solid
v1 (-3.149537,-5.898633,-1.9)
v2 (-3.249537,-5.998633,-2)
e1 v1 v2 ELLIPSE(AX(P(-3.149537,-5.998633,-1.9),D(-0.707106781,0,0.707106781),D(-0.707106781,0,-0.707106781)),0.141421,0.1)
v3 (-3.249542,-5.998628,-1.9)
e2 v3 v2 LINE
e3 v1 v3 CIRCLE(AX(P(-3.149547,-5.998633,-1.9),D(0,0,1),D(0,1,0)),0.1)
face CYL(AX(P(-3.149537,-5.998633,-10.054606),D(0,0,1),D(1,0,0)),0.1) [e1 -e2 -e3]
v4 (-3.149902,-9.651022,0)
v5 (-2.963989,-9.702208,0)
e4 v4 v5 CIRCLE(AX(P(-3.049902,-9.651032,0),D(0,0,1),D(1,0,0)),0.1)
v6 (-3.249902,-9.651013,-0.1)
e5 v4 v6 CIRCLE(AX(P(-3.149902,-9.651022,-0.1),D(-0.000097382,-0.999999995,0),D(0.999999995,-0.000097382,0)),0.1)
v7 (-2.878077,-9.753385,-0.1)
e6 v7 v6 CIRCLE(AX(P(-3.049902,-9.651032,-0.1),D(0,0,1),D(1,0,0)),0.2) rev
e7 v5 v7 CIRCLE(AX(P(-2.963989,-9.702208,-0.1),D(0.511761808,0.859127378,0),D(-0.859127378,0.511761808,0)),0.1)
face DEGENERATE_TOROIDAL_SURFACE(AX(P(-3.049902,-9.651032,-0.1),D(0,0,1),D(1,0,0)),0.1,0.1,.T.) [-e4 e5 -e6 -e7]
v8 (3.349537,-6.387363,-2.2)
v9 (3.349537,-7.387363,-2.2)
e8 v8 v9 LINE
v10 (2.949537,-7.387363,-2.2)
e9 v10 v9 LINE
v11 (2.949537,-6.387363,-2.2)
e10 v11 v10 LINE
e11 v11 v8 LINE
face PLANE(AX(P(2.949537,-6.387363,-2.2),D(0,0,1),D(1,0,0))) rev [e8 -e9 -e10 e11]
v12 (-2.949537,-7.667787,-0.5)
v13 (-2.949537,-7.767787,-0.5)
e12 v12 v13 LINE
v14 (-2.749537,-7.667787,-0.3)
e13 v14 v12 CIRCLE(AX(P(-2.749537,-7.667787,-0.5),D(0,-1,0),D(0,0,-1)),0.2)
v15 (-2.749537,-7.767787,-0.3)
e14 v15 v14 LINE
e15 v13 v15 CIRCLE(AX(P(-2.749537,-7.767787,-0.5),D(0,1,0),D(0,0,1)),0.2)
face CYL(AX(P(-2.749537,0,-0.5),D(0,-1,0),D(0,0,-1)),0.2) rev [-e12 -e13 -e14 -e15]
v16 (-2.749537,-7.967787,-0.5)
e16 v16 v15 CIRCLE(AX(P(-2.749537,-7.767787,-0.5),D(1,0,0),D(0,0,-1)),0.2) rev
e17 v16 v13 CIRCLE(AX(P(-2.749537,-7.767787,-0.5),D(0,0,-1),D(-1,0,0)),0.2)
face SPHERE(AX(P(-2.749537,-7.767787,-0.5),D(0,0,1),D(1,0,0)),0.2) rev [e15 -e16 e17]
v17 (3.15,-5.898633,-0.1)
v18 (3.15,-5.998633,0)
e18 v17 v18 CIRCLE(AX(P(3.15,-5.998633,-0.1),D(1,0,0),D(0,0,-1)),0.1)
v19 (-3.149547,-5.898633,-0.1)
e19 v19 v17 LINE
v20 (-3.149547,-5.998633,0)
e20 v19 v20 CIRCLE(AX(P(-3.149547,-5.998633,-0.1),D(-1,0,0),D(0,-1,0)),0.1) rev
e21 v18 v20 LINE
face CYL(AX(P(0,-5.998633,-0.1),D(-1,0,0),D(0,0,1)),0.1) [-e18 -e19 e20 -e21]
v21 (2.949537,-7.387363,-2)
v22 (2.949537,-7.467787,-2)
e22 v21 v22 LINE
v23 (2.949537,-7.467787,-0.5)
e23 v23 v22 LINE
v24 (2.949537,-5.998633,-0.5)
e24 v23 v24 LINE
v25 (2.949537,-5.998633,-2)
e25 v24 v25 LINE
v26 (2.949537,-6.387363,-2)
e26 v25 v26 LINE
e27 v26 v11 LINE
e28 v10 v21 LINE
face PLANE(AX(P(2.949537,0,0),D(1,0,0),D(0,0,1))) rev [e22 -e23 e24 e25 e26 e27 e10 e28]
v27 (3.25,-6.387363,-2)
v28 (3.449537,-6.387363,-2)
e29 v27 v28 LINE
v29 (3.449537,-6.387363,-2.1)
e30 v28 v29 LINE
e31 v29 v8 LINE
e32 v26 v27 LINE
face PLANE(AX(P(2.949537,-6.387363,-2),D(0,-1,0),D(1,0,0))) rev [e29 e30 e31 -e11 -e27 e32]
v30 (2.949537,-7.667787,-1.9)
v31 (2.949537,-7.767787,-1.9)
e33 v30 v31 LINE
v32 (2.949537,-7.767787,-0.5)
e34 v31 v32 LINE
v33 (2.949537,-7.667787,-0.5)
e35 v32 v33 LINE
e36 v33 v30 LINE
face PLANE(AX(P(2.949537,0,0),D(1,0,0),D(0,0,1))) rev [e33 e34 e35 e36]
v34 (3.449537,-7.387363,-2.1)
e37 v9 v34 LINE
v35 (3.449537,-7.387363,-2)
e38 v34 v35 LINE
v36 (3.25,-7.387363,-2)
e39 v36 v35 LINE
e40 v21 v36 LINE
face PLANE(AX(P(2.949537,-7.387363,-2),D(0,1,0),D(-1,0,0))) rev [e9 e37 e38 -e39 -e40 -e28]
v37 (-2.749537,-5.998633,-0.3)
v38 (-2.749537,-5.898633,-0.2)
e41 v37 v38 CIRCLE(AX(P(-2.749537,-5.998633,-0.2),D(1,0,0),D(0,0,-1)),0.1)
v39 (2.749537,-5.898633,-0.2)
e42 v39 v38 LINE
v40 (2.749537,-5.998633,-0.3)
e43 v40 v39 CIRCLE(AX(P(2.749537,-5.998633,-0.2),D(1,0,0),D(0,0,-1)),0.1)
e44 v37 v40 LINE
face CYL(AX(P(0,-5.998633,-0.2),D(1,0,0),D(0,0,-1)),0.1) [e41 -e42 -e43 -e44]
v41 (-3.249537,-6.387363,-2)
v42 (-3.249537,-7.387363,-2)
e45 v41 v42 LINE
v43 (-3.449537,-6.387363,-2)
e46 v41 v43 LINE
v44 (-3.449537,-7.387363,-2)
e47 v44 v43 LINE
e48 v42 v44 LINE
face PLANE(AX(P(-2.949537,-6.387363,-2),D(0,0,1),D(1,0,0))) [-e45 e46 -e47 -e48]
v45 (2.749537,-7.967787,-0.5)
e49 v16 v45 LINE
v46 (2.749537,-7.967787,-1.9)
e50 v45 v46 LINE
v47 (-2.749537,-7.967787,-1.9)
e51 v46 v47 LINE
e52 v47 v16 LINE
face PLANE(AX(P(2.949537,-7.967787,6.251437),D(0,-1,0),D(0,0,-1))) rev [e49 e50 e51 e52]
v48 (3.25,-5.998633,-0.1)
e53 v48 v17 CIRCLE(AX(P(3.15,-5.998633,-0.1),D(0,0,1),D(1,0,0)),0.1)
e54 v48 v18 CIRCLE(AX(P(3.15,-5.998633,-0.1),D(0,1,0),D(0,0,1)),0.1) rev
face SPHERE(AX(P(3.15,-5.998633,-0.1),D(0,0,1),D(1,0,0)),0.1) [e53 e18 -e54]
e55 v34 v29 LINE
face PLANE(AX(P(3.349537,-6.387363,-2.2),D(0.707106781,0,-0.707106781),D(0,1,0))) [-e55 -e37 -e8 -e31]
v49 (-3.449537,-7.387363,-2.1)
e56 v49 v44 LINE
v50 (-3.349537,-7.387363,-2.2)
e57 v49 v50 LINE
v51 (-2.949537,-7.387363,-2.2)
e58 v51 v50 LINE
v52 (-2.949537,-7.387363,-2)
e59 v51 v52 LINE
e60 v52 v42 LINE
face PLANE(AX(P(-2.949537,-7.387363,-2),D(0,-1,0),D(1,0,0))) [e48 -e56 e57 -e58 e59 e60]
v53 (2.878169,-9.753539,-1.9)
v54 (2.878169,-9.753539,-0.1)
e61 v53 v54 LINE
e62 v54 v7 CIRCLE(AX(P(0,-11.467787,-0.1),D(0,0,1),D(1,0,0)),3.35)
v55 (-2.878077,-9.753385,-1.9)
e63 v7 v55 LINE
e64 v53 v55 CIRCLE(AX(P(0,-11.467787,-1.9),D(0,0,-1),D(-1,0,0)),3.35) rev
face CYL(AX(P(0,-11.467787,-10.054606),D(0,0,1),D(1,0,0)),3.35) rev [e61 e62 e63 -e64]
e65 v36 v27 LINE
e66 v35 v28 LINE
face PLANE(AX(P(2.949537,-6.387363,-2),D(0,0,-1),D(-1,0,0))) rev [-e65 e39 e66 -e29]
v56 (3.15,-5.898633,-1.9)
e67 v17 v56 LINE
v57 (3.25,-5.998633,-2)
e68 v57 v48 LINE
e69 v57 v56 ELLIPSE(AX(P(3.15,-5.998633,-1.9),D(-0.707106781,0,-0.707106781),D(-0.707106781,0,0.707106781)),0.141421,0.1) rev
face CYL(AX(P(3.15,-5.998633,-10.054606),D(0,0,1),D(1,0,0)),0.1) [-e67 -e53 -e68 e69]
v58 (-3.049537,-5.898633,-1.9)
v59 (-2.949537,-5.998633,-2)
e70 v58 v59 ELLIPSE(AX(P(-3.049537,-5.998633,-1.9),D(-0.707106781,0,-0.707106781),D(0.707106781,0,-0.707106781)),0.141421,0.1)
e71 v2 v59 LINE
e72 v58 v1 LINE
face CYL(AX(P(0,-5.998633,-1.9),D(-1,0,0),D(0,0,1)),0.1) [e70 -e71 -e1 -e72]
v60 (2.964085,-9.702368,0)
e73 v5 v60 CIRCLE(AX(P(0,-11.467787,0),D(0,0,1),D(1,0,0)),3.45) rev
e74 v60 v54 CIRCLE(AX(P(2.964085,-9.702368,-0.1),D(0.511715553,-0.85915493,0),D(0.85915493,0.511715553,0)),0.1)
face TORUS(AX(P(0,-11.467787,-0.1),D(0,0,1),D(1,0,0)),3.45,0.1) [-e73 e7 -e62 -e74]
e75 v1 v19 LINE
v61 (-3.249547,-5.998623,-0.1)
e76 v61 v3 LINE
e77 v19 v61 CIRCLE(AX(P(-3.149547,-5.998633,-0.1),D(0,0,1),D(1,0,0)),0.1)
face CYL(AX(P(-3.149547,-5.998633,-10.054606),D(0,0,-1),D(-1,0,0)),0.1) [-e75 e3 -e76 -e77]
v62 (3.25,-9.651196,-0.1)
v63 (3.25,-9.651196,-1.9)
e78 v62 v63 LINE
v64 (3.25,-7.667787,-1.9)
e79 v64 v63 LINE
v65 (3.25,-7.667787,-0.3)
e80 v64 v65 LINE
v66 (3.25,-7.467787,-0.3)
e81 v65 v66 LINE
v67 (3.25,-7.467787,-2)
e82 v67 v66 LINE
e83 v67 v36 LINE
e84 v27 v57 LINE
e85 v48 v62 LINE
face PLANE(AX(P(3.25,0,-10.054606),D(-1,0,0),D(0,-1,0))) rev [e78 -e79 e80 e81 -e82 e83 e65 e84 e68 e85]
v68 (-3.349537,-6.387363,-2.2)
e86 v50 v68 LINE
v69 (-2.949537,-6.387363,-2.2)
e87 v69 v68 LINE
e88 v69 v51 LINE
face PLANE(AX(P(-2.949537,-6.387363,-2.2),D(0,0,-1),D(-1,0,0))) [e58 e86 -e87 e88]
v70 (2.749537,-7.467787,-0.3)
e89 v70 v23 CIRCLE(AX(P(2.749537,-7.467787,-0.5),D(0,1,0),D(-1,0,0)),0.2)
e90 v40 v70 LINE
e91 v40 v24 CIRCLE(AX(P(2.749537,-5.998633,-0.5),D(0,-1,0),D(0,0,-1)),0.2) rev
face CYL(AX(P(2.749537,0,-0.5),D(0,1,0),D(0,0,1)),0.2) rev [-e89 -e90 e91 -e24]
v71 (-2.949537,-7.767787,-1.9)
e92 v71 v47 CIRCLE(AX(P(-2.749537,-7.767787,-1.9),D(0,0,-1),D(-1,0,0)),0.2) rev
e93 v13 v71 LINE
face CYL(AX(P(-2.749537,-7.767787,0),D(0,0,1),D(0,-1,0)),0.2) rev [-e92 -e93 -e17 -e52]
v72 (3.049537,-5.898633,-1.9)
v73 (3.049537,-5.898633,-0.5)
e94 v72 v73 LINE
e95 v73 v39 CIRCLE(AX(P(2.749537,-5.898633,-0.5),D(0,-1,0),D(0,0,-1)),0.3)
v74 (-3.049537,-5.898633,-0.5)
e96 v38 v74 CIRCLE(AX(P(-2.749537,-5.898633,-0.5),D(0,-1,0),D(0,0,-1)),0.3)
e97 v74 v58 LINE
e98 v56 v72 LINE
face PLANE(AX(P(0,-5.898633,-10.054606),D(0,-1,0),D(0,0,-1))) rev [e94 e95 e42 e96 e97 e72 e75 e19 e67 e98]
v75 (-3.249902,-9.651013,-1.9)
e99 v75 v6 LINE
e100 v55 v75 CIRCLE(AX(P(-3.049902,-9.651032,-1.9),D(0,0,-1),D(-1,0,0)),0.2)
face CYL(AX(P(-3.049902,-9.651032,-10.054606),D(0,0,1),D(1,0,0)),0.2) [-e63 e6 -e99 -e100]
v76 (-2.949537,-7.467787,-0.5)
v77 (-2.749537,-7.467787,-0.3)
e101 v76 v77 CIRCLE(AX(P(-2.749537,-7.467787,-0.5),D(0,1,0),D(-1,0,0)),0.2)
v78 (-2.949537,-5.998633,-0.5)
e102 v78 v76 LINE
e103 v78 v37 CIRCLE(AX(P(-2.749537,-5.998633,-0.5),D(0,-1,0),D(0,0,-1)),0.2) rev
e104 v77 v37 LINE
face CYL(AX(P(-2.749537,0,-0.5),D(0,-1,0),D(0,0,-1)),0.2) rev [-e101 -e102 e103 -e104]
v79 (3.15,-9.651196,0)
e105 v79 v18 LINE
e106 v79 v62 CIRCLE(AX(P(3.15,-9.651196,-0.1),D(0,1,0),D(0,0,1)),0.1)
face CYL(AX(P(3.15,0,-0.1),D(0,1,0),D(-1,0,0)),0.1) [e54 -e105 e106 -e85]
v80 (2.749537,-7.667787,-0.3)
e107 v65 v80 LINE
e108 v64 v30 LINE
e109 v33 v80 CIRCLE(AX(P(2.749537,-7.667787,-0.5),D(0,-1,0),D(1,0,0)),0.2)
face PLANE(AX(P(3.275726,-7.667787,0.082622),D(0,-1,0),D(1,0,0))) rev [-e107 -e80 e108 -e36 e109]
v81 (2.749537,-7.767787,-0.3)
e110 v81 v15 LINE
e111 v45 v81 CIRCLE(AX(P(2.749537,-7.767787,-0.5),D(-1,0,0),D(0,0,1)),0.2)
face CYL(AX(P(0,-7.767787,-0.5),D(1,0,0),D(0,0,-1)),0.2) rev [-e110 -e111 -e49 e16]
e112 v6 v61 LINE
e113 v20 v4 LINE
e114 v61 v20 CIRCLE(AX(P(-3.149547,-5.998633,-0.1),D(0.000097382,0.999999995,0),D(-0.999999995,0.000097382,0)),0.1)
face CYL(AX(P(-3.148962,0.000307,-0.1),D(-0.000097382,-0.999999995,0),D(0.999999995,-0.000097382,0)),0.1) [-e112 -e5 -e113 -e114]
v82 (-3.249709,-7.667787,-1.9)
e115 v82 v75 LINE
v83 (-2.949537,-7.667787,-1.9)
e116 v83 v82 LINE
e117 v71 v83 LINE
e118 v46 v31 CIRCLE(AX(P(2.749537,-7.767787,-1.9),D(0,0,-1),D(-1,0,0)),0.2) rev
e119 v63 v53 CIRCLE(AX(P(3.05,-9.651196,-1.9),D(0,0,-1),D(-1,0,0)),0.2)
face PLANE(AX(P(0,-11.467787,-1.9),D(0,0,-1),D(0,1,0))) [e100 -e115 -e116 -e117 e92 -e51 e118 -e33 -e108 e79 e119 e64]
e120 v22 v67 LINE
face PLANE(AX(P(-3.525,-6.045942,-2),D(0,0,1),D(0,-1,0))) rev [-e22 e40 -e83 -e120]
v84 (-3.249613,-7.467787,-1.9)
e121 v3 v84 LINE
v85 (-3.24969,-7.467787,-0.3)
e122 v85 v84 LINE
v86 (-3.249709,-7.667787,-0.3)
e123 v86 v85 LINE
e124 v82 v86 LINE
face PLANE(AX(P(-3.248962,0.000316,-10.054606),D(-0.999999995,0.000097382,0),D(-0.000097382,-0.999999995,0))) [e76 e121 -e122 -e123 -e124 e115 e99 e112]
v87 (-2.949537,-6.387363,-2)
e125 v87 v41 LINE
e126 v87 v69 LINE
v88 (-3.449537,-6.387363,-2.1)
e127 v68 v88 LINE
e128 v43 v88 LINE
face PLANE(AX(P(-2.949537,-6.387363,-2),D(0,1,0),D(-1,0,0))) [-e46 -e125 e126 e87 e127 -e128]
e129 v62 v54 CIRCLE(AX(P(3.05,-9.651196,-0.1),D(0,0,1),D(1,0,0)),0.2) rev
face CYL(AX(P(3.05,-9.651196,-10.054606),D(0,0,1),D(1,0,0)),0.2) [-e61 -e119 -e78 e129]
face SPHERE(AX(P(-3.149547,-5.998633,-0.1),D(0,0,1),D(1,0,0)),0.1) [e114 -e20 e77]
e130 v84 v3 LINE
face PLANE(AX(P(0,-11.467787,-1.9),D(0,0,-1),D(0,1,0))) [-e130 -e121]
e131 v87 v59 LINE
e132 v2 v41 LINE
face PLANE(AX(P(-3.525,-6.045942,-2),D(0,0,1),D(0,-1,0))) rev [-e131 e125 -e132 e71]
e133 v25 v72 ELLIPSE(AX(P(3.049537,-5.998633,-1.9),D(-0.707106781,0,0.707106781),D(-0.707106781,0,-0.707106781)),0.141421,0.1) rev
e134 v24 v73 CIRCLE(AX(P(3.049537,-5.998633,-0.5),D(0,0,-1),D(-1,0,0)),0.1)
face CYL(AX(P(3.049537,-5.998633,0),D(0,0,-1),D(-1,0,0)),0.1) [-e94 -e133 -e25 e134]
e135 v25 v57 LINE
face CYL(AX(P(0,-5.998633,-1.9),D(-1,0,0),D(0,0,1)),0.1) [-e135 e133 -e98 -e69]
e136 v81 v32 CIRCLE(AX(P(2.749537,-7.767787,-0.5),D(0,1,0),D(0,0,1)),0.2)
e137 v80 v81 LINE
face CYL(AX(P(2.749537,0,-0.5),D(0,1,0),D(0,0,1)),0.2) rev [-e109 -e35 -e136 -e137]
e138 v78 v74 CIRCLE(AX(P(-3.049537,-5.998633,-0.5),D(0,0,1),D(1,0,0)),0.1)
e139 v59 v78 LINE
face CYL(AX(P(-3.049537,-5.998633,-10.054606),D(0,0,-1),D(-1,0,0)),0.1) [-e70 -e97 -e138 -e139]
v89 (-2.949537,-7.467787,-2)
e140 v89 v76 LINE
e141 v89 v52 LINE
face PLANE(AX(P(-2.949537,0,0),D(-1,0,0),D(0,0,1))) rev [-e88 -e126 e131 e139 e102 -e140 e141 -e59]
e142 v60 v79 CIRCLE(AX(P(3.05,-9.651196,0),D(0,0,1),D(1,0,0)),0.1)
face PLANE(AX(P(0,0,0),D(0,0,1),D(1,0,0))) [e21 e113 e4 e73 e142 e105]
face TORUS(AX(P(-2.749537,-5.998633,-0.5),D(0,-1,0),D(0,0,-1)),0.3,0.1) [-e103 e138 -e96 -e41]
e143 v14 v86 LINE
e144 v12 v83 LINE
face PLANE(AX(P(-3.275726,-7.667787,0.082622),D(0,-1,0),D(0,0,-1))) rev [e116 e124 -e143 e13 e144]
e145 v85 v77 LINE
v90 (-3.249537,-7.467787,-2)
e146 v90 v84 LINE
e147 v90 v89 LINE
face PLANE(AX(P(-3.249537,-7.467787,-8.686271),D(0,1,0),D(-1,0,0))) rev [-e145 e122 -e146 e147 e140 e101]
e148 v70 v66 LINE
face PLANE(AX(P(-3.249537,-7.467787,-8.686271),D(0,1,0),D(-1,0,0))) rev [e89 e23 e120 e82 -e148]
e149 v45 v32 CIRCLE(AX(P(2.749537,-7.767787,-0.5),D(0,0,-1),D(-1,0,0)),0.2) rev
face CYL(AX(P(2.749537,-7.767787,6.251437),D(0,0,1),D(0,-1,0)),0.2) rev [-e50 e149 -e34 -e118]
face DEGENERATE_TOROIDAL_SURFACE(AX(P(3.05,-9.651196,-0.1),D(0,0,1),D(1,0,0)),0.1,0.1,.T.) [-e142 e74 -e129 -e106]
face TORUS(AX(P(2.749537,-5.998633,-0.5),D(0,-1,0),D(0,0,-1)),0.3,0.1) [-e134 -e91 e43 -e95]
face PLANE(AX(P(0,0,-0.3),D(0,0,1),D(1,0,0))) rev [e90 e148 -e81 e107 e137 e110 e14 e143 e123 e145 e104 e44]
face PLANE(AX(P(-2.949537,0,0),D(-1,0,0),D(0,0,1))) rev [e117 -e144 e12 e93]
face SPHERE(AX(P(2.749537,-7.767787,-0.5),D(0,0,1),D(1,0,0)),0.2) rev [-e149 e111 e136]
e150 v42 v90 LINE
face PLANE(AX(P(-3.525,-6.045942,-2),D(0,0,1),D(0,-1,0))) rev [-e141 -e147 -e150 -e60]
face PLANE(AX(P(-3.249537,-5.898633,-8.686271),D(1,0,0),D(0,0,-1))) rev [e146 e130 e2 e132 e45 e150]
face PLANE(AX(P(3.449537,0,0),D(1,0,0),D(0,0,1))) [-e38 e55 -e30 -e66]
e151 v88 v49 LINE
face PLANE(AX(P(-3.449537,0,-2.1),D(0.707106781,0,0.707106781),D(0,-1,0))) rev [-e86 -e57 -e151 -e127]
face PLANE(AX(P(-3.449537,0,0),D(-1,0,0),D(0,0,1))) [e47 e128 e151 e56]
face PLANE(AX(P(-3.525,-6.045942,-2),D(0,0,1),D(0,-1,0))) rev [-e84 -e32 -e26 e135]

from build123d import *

# Parameters (mm, degrees)
BOSS_EXTRUDE1_DEPTH = 1.9
SKETCH2_W           = 6.499536779
SKETCH2_H           = 1.569153834
BOSS_EXTRUDE2_DEPTH = 0.1
BOSS_EXTRUDE3_START = -0.3
SKETCH3_W           = 0.2
SKETCH3_H           = 1
BOSS_EXTRUDE3_DEPTH = 0.5
SKETCH4_W           = 5.899073558
SKETCH4_H           = 2.069153834
CUT_EXTRUDE1_DEPTH  = 1.7
CHAMFER1_SIZE       = 0.1
SKETCH5_W           = 0.32618924
SKETCH5_H           = 0.2
CUT_EXTRUDE2_DEPTH  = 1.6
FILLET1_R           = 0.2
FILLET2_R           = 0.2
FILLET3_R           = 0.1


with BuildPart() as part:
    # Sketch1 → Boss-Extrude1 (new body)
    with BuildSketch(Plane.XY):
        with BuildLine():
            Line((3.25, -5.898632739), (-3.249536779, -5.898632739))
            Line((-3.249536779, -5.898632739), (-3.25, -10.655382732))
            ThreePointArc((-3.25, -10.655382732), (0, -8.117786573), (3.25, -10.655382732))
            Line((3.25, -10.655382732), (3.25, -5.898632739))
        make_face()
    extrude(amount=-BOSS_EXTRUDE1_DEPTH)

    # Sketch2 → Boss-Extrude2 (add)
    with BuildSketch(Plane(origin=(0, 0, -1.9), x_dir=(-1, 0, 0), z_dir=(0, 0, -1))):
        with Locations((-0.00023161, -6.683209656)):
            Rectangle(SKETCH2_W, SKETCH2_H)
    extrude(amount=BOSS_EXTRUDE2_DEPTH)

    # Sketch3 → Boss-Extrude3 (add)
    with BuildSketch(Plane.ZY.offset(3.249536779).offset(BOSS_EXTRUDE3_START)):
        with Locations((-2.1, -6.887362902)):
            Rectangle(SKETCH3_W, SKETCH3_H)
    boss_extrude3 = extrude(amount=BOSS_EXTRUDE3_DEPTH)

    # Mirror1: Boss-Extrude3 across plane
    add(boss_extrude3.mirror(Plane(origin=(0, 0, 0), x_dir=(0, 0, 1), z_dir=(1, 0, 0))))

    # Sketch4 → Cut-Extrude1 (cut)
    with BuildSketch(Plane(origin=(0, 0, -2), x_dir=(-1, 0, 0), z_dir=(0, 0, -1))):
        with Locations((0, -6.933209656)):
            Rectangle(SKETCH4_W, SKETCH4_H)
    extrude(amount=-CUT_EXTRUDE1_DEPTH, mode=Mode.SUBTRACT)

    # Chamfer1
    chamfer1_edges = [part.edges().sort_by_distance(p)[0] for p in [
        (-3.449536779, -6.887362902, -2.2),
        (3.449536779, -6.887362902, -2.2),
    ]]
    chamfer(chamfer1_edges, length=CHAMFER1_SIZE)

    # Sketch5 → Cut-Extrude2 (cut)
    with BuildSketch(Plane(origin=(0, 0, -1.9), x_dir=(-1, 0, 0), z_dir=(0, 0, -1))):
        with Locations((3.112631399, -7.567786573)):
            Rectangle(SKETCH5_W, SKETCH5_H)
        with Locations((-3.112631399, -7.567786573)):
            Rectangle(SKETCH5_W, SKETCH5_H)
    extrude(amount=-CUT_EXTRUDE2_DEPTH, mode=Mode.SUBTRACT)

    # Fillet1
    fillet1_edges = [part.edges().sort_by_distance(p)[0] for p in [
        (2.949536779, -6.683209656, -0.3),
        (2.949536779, -7.967786573, -1.1),
        (0, -7.967786573, -0.3),
        (-2.949536779, -7.967786573, -1.1),
        (-2.949536779, -7.817786573, -0.3),
        (-2.949536779, -6.683209656, -0.3),
        (2.949536779, -7.817786573, -0.3),
    ]]
    fillet(fillet1_edges, radius=FILLET1_R)

    # Fillet2
    fillet2_edges = [part.edges().sort_by_distance(p)[0] for p in [
        (-3.25, -10.655382732, -0.95),
        (3.25, -10.655382732, -0.95),
    ]]
    fillet(fillet2_edges, radius=FILLET2_R)

    # Fillet3
    # the kernel refuses this fillet: 0.1 mm, written as the material it takes off along each edge
    with BuildSketch(Plane(origin=(3.15, -5.998632739, -0.1), x_dir=(1, 0, 0), z_dir=(0, 0, 1))) as fillet3_piece_1_section:
        Polygon((0, 0), (FILLET3_R, 0), (FILLET3_R, FILLET3_R), (0, FILLET3_R), align=None)
    fillet3_piece_1 = extrude(amount=FILLET3_R, mode=Mode.PRIVATE)
    fillet3_piece_1 = fillet3_piece_1 - Plane(origin=(3.15, -5.998632739, -0.1), x_dir=(-0.7071067811865476, -0.7071067811865475, 0), z_dir=(0, 0, 1)) * Sphere(FILLET3_R, mode=Mode.PRIVATE)
    add(fillet3_piece_1, mode=Mode.SUBTRACT)
    with BuildSketch(Plane(origin=(-3.149546516, -5.998632739, -0.1), x_dir=(0, 1, 0), z_dir=(0, 0, 1))) as fillet3_piece_2_section:
        Polygon((0, 0), (FILLET3_R, 0), (FILLET3_R, FILLET3_R * 0.999902622813), (FILLET3_R * 9.738192815e-05, FILLET3_R * 0.999999995258), align=None)
    fillet3_piece_2 = extrude(amount=FILLET3_R, mode=Mode.PRIVATE)
    fillet3_piece_2 = fillet3_piece_2 - Plane(origin=(-3.149546516, -5.998632739, -0.1), x_dir=(0.7070723506374189, -0.7071412100592604, 0), z_dir=(0, 0, 1)) * Sphere(FILLET3_R, mode=Mode.PRIVATE)
    add(fillet3_piece_2, mode=Mode.SUBTRACT)
    with BuildSketch(Plane(origin=(3.25, -9.65119636, 0), x_dir=(-1, 0, 0), z_dir=(0, 1, 0))) as fillet3_piece_3:
        with BuildLine():
            CenterArc((FILLET3_R, -FILLET3_R), FILLET3_R, 90, 90)
            Line((0, -FILLET3_R), (0, 0))
            Line((0, 0), (FILLET3_R, 0))
        make_face()
    extrude(amount=3.652563621, mode=Mode.SUBTRACT)
    with BuildSketch(Plane(origin=(3.05, -9.65119636, 0), x_dir=(-0.8591549295774534, -0.511715552805229, 0), z_dir=(-0.511715552805229, 0.8591549295774534, 0))) as fillet3_piece_4:
        with BuildLine():
            CenterArc((0.2 - FILLET3_R, -FILLET3_R), FILLET3_R, 0, 90)
            Line((0.2, -FILLET3_R), (0.2, 0))
            Line((0.2, 0), (0.2 - FILLET3_R, 0))
        make_face()
    revolve(axis=Axis((3.05, -9.65119636, 0), (0, 0, 1)), revolution_arc=149.221830438, mode=Mode.SUBTRACT)
    with BuildSketch(Plane(origin=(0, -11.467786573, 0), x_dir=(-0.8591273784381983, 0.5117618075021901, 0), z_dir=(-0.5117618075021901, -0.8591273784381983, 0))) as fillet3_piece_5:
        with BuildLine():
            CenterArc((3.35 + FILLET3_R, FILLET3_R), FILLET3_R, 180, 90)
            Line((3.35, FILLET3_R), (3.35, 0))
            Line((3.35, 0), (3.35 + FILLET3_R, 0))
        make_face()
    revolve(axis=Axis((0, -11.467786573, 0), (0, 0, -1)), revolution_arc=118.440576169, mode=Mode.SUBTRACT)
    with BuildSketch(Plane(origin=(-3.049902193, -9.651032156, 0), x_dir=(0.8591273784382029, -0.5117618075021826, 0), z_dir=(0.5117618075021826, 0.8591273784382029, 0))) as fillet3_piece_6:
        with BuildLine():
            CenterArc((0.2 - FILLET3_R, FILLET3_R), FILLET3_R, 270, 90)
            Line((0.2, FILLET3_R), (0.2, 0))
            Line((0.2, 0), (0.2 - FILLET3_R, 0))
        make_face()
    revolve(axis=Axis((-3.049902193, -9.651032156, 0), (0, 0, -1)), revolution_arc=149.224325304, mode=Mode.SUBTRACT)
    with BuildSketch(Plane(origin=(-3.249546516, -5.998623001, 0), x_dir=(0.99999999525838, -9.738192814999169e-05, 0), z_dir=(-9.73819281499917e-05, -0.9999999952583801, 0))) as fillet3_piece_7:
        with BuildLine():
            CenterArc((FILLET3_R, -FILLET3_R), FILLET3_R, 90, 90)
            Line((0, -FILLET3_R), (0, 0))
            Line((0, 0), (FILLET3_R, 0))
        make_face()
    extrude(amount=3.652389696, mode=Mode.SUBTRACT)
    with BuildSketch(Plane(origin=(3.25, -5.898632739, -0.1), x_dir=(0, -1, 0), z_dir=(0, 0, -1))) as fillet3_piece_8:
        with BuildLine():
            CenterArc((FILLET3_R, FILLET3_R), FILLET3_R, 180, 90)
            Line((0, FILLET3_R), (0, 0))
            Line((0, 0), (FILLET3_R, 0))
        make_face()
    extrude(amount=1.8, mode=Mode.SUBTRACT)
    with BuildSketch(Plane(origin=(3.15, -5.898632739, 0), x_dir=(0, -1, 0), z_dir=(-1, 0, 0))) as fillet3_piece_9:
        with BuildLine():
            CenterArc((FILLET3_R, -FILLET3_R), FILLET3_R, 90, 90)
            Line((0, -FILLET3_R), (0, 0))
            Line((0, 0), (FILLET3_R, 0))
        make_face()
    extrude(amount=6.299546516, mode=Mode.SUBTRACT)
    with BuildSketch(Plane(origin=(-3.249536779, -5.898632739, -0.1), x_dir=(1, 0, 0), z_dir=(0, 0, -1))) as fillet3_piece_10:
        with BuildLine():
            CenterArc((FILLET3_R * 0.999902622813, FILLET3_R), FILLET3_R, 180.005579573, 89.994420427)
            Line((-FILLET3_R * 9.73724453734e-05, FILLET3_R * 0.999902618072), (0, 0))
            Line((0, 0), (FILLET3_R * 0.999902622813, 0))
        make_face()
    extrude(amount=1.8, mode=Mode.SUBTRACT)
    with BuildSketch(Plane(origin=(-3.249536779, -5.898632739, -1.9), x_dir=(1.0, -4.7416204296268874e-09, 0), z_dir=(0, 0, -1)), Plane(origin=(3.25, -5.898632739, -1.9), x_dir=(0, -1, 0), z_dir=(0, 0, -1))) as fillet3_piece_11:
        with BuildLine():
            CenterArc((FILLET3_R * 1.00000000474, FILLET3_R), FILLET3_R, 179.999999728, 90)
            Line((FILLET3_R * 4.74162045211e-09, FILLET3_R * 1.00000000474), (0, 0))
            Line((0, 0), (FILLET3_R, 0))
        make_face()
    extrude(amount=0.350000001, mode=Mode.SUBTRACT)
    with BuildSketch(Plane(origin=(-3.49953678, -5.898632739, -2), x_dir=(0, -4.7416204296268874e-09, 1.0), z_dir=(1, 0, 0))) as fillet3_piece_12:
        with BuildLine():
            CenterArc((FILLET3_R * 1.00000000474, FILLET3_R), FILLET3_R, 179.999999728, 90)
            Line((FILLET3_R * 4.74162045211e-09, FILLET3_R * 1.00000000474), (0, 0))
            Line((0, 0), (FILLET3_R, 0))
        make_face()
    extrude(amount=0.800000002, mode=Mode.SUBTRACT)
    with BuildSketch(Plane(origin=(-2.949536779, -5.898632739, -2.250000001), x_dir=(-1.0, -4.7416204296268874e-09, 0), z_dir=(0, 0, 1))) as fillet3_piece_13:
        with BuildLine():
            CenterArc((FILLET3_R * 1.00000000474, FILLET3_R), FILLET3_R, 179.999999728, 90)
            Line((FILLET3_R * 4.74162045211e-09, FILLET3_R * 1.00000000474), (0, 0))
            Line((0, 0), (FILLET3_R, 0))
        make_face()
    extrude(amount=1.750000001, mode=Mode.SUBTRACT)
    with BuildSketch(Plane(origin=(-2.749536779, -5.898632739, -0.5), x_dir=(0, 0, 1), z_dir=(1, 0, 0))) as fillet3_piece_14:
        with BuildLine():
            CenterArc((0.2 + FILLET3_R, FILLET3_R), FILLET3_R, 180, 90)
            Line((0.2, FILLET3_R), (0.2, 0))
            Line((0.2, 0), (0.2 + FILLET3_R, 0))
        make_face()
    revolve(axis=Axis((-2.749536779, -5.898632739, -0.5), (0, -1, 0)), revolution_arc=90, mode=Mode.SUBTRACT)
    with BuildSketch(Plane(origin=(-2.749536779, -5.898632739, -0.3), x_dir=(0, -4.7416204296268916e-09, 1.0), z_dir=(1, 0, 0))) as fillet3_piece_15:
        with BuildLine():
            CenterArc((FILLET3_R * 1.00000000474, FILLET3_R), FILLET3_R, 179.999999728, 90)
            Line((FILLET3_R * 4.74162045211e-09, FILLET3_R * 1.00000000474), (0, 0))
            Line((0, 0), (FILLET3_R, 0))
        make_face()
    extrude(amount=5.499073557, mode=Mode.SUBTRACT)
    with BuildSketch(Plane(origin=(2.749536779, -5.898632739, -0.5), x_dir=(0, 0, 1), z_dir=(-1, 0, 0))) as fillet3_piece_16:
        with BuildLine():
            CenterArc((0.2 + FILLET3_R, -FILLET3_R), FILLET3_R, 90, 90)
            Line((0.2, -FILLET3_R), (0.2, 0))
            Line((0.2, 0), (0.2 + FILLET3_R, 0))
        make_face()
    revolve(axis=Axis((2.749536779, -5.898632739, -0.5), (0, 1, 0)), revolution_arc=90, mode=Mode.SUBTRACT)
    with BuildSketch(Plane(origin=(2.949536779, -5.898632739, -2.250000001), x_dir=(1.0, -4.7416204296268874e-09, 0), z_dir=(0, 0, 1))) as fillet3_piece_17:
        with BuildLine():
            CenterArc((FILLET3_R * 1.00000000474, -FILLET3_R), FILLET3_R, 90.000000272, 90)
            Line((FILLET3_R * 4.74162045211e-09, -FILLET3_R * 1.00000000474), (0, 0))
            Line((0, 0), (FILLET3_R, 0))
        make_face()
    extrude(amount=1.750000001, mode=Mode.SUBTRACT)
    with BuildSketch(Plane(origin=(2.699536777, -5.898632739, -2), x_dir=(0, -4.7416204296268874e-09, 1.0), z_dir=(1, 0, 0))) as fillet3_piece_18:
        with BuildLine():
            CenterArc((FILLET3_R * 1.00000000474, FILLET3_R), FILLET3_R, 179.999999728, 90)
            Line((FILLET3_R * 4.74162045211e-09, FILLET3_R * 1.00000000474), (0, 0))
            Line((0, 0), (FILLET3_R, 0))
        make_face()
    extrude(amount=0.800463224, mode=Mode.SUBTRACT)


solid = part.part
